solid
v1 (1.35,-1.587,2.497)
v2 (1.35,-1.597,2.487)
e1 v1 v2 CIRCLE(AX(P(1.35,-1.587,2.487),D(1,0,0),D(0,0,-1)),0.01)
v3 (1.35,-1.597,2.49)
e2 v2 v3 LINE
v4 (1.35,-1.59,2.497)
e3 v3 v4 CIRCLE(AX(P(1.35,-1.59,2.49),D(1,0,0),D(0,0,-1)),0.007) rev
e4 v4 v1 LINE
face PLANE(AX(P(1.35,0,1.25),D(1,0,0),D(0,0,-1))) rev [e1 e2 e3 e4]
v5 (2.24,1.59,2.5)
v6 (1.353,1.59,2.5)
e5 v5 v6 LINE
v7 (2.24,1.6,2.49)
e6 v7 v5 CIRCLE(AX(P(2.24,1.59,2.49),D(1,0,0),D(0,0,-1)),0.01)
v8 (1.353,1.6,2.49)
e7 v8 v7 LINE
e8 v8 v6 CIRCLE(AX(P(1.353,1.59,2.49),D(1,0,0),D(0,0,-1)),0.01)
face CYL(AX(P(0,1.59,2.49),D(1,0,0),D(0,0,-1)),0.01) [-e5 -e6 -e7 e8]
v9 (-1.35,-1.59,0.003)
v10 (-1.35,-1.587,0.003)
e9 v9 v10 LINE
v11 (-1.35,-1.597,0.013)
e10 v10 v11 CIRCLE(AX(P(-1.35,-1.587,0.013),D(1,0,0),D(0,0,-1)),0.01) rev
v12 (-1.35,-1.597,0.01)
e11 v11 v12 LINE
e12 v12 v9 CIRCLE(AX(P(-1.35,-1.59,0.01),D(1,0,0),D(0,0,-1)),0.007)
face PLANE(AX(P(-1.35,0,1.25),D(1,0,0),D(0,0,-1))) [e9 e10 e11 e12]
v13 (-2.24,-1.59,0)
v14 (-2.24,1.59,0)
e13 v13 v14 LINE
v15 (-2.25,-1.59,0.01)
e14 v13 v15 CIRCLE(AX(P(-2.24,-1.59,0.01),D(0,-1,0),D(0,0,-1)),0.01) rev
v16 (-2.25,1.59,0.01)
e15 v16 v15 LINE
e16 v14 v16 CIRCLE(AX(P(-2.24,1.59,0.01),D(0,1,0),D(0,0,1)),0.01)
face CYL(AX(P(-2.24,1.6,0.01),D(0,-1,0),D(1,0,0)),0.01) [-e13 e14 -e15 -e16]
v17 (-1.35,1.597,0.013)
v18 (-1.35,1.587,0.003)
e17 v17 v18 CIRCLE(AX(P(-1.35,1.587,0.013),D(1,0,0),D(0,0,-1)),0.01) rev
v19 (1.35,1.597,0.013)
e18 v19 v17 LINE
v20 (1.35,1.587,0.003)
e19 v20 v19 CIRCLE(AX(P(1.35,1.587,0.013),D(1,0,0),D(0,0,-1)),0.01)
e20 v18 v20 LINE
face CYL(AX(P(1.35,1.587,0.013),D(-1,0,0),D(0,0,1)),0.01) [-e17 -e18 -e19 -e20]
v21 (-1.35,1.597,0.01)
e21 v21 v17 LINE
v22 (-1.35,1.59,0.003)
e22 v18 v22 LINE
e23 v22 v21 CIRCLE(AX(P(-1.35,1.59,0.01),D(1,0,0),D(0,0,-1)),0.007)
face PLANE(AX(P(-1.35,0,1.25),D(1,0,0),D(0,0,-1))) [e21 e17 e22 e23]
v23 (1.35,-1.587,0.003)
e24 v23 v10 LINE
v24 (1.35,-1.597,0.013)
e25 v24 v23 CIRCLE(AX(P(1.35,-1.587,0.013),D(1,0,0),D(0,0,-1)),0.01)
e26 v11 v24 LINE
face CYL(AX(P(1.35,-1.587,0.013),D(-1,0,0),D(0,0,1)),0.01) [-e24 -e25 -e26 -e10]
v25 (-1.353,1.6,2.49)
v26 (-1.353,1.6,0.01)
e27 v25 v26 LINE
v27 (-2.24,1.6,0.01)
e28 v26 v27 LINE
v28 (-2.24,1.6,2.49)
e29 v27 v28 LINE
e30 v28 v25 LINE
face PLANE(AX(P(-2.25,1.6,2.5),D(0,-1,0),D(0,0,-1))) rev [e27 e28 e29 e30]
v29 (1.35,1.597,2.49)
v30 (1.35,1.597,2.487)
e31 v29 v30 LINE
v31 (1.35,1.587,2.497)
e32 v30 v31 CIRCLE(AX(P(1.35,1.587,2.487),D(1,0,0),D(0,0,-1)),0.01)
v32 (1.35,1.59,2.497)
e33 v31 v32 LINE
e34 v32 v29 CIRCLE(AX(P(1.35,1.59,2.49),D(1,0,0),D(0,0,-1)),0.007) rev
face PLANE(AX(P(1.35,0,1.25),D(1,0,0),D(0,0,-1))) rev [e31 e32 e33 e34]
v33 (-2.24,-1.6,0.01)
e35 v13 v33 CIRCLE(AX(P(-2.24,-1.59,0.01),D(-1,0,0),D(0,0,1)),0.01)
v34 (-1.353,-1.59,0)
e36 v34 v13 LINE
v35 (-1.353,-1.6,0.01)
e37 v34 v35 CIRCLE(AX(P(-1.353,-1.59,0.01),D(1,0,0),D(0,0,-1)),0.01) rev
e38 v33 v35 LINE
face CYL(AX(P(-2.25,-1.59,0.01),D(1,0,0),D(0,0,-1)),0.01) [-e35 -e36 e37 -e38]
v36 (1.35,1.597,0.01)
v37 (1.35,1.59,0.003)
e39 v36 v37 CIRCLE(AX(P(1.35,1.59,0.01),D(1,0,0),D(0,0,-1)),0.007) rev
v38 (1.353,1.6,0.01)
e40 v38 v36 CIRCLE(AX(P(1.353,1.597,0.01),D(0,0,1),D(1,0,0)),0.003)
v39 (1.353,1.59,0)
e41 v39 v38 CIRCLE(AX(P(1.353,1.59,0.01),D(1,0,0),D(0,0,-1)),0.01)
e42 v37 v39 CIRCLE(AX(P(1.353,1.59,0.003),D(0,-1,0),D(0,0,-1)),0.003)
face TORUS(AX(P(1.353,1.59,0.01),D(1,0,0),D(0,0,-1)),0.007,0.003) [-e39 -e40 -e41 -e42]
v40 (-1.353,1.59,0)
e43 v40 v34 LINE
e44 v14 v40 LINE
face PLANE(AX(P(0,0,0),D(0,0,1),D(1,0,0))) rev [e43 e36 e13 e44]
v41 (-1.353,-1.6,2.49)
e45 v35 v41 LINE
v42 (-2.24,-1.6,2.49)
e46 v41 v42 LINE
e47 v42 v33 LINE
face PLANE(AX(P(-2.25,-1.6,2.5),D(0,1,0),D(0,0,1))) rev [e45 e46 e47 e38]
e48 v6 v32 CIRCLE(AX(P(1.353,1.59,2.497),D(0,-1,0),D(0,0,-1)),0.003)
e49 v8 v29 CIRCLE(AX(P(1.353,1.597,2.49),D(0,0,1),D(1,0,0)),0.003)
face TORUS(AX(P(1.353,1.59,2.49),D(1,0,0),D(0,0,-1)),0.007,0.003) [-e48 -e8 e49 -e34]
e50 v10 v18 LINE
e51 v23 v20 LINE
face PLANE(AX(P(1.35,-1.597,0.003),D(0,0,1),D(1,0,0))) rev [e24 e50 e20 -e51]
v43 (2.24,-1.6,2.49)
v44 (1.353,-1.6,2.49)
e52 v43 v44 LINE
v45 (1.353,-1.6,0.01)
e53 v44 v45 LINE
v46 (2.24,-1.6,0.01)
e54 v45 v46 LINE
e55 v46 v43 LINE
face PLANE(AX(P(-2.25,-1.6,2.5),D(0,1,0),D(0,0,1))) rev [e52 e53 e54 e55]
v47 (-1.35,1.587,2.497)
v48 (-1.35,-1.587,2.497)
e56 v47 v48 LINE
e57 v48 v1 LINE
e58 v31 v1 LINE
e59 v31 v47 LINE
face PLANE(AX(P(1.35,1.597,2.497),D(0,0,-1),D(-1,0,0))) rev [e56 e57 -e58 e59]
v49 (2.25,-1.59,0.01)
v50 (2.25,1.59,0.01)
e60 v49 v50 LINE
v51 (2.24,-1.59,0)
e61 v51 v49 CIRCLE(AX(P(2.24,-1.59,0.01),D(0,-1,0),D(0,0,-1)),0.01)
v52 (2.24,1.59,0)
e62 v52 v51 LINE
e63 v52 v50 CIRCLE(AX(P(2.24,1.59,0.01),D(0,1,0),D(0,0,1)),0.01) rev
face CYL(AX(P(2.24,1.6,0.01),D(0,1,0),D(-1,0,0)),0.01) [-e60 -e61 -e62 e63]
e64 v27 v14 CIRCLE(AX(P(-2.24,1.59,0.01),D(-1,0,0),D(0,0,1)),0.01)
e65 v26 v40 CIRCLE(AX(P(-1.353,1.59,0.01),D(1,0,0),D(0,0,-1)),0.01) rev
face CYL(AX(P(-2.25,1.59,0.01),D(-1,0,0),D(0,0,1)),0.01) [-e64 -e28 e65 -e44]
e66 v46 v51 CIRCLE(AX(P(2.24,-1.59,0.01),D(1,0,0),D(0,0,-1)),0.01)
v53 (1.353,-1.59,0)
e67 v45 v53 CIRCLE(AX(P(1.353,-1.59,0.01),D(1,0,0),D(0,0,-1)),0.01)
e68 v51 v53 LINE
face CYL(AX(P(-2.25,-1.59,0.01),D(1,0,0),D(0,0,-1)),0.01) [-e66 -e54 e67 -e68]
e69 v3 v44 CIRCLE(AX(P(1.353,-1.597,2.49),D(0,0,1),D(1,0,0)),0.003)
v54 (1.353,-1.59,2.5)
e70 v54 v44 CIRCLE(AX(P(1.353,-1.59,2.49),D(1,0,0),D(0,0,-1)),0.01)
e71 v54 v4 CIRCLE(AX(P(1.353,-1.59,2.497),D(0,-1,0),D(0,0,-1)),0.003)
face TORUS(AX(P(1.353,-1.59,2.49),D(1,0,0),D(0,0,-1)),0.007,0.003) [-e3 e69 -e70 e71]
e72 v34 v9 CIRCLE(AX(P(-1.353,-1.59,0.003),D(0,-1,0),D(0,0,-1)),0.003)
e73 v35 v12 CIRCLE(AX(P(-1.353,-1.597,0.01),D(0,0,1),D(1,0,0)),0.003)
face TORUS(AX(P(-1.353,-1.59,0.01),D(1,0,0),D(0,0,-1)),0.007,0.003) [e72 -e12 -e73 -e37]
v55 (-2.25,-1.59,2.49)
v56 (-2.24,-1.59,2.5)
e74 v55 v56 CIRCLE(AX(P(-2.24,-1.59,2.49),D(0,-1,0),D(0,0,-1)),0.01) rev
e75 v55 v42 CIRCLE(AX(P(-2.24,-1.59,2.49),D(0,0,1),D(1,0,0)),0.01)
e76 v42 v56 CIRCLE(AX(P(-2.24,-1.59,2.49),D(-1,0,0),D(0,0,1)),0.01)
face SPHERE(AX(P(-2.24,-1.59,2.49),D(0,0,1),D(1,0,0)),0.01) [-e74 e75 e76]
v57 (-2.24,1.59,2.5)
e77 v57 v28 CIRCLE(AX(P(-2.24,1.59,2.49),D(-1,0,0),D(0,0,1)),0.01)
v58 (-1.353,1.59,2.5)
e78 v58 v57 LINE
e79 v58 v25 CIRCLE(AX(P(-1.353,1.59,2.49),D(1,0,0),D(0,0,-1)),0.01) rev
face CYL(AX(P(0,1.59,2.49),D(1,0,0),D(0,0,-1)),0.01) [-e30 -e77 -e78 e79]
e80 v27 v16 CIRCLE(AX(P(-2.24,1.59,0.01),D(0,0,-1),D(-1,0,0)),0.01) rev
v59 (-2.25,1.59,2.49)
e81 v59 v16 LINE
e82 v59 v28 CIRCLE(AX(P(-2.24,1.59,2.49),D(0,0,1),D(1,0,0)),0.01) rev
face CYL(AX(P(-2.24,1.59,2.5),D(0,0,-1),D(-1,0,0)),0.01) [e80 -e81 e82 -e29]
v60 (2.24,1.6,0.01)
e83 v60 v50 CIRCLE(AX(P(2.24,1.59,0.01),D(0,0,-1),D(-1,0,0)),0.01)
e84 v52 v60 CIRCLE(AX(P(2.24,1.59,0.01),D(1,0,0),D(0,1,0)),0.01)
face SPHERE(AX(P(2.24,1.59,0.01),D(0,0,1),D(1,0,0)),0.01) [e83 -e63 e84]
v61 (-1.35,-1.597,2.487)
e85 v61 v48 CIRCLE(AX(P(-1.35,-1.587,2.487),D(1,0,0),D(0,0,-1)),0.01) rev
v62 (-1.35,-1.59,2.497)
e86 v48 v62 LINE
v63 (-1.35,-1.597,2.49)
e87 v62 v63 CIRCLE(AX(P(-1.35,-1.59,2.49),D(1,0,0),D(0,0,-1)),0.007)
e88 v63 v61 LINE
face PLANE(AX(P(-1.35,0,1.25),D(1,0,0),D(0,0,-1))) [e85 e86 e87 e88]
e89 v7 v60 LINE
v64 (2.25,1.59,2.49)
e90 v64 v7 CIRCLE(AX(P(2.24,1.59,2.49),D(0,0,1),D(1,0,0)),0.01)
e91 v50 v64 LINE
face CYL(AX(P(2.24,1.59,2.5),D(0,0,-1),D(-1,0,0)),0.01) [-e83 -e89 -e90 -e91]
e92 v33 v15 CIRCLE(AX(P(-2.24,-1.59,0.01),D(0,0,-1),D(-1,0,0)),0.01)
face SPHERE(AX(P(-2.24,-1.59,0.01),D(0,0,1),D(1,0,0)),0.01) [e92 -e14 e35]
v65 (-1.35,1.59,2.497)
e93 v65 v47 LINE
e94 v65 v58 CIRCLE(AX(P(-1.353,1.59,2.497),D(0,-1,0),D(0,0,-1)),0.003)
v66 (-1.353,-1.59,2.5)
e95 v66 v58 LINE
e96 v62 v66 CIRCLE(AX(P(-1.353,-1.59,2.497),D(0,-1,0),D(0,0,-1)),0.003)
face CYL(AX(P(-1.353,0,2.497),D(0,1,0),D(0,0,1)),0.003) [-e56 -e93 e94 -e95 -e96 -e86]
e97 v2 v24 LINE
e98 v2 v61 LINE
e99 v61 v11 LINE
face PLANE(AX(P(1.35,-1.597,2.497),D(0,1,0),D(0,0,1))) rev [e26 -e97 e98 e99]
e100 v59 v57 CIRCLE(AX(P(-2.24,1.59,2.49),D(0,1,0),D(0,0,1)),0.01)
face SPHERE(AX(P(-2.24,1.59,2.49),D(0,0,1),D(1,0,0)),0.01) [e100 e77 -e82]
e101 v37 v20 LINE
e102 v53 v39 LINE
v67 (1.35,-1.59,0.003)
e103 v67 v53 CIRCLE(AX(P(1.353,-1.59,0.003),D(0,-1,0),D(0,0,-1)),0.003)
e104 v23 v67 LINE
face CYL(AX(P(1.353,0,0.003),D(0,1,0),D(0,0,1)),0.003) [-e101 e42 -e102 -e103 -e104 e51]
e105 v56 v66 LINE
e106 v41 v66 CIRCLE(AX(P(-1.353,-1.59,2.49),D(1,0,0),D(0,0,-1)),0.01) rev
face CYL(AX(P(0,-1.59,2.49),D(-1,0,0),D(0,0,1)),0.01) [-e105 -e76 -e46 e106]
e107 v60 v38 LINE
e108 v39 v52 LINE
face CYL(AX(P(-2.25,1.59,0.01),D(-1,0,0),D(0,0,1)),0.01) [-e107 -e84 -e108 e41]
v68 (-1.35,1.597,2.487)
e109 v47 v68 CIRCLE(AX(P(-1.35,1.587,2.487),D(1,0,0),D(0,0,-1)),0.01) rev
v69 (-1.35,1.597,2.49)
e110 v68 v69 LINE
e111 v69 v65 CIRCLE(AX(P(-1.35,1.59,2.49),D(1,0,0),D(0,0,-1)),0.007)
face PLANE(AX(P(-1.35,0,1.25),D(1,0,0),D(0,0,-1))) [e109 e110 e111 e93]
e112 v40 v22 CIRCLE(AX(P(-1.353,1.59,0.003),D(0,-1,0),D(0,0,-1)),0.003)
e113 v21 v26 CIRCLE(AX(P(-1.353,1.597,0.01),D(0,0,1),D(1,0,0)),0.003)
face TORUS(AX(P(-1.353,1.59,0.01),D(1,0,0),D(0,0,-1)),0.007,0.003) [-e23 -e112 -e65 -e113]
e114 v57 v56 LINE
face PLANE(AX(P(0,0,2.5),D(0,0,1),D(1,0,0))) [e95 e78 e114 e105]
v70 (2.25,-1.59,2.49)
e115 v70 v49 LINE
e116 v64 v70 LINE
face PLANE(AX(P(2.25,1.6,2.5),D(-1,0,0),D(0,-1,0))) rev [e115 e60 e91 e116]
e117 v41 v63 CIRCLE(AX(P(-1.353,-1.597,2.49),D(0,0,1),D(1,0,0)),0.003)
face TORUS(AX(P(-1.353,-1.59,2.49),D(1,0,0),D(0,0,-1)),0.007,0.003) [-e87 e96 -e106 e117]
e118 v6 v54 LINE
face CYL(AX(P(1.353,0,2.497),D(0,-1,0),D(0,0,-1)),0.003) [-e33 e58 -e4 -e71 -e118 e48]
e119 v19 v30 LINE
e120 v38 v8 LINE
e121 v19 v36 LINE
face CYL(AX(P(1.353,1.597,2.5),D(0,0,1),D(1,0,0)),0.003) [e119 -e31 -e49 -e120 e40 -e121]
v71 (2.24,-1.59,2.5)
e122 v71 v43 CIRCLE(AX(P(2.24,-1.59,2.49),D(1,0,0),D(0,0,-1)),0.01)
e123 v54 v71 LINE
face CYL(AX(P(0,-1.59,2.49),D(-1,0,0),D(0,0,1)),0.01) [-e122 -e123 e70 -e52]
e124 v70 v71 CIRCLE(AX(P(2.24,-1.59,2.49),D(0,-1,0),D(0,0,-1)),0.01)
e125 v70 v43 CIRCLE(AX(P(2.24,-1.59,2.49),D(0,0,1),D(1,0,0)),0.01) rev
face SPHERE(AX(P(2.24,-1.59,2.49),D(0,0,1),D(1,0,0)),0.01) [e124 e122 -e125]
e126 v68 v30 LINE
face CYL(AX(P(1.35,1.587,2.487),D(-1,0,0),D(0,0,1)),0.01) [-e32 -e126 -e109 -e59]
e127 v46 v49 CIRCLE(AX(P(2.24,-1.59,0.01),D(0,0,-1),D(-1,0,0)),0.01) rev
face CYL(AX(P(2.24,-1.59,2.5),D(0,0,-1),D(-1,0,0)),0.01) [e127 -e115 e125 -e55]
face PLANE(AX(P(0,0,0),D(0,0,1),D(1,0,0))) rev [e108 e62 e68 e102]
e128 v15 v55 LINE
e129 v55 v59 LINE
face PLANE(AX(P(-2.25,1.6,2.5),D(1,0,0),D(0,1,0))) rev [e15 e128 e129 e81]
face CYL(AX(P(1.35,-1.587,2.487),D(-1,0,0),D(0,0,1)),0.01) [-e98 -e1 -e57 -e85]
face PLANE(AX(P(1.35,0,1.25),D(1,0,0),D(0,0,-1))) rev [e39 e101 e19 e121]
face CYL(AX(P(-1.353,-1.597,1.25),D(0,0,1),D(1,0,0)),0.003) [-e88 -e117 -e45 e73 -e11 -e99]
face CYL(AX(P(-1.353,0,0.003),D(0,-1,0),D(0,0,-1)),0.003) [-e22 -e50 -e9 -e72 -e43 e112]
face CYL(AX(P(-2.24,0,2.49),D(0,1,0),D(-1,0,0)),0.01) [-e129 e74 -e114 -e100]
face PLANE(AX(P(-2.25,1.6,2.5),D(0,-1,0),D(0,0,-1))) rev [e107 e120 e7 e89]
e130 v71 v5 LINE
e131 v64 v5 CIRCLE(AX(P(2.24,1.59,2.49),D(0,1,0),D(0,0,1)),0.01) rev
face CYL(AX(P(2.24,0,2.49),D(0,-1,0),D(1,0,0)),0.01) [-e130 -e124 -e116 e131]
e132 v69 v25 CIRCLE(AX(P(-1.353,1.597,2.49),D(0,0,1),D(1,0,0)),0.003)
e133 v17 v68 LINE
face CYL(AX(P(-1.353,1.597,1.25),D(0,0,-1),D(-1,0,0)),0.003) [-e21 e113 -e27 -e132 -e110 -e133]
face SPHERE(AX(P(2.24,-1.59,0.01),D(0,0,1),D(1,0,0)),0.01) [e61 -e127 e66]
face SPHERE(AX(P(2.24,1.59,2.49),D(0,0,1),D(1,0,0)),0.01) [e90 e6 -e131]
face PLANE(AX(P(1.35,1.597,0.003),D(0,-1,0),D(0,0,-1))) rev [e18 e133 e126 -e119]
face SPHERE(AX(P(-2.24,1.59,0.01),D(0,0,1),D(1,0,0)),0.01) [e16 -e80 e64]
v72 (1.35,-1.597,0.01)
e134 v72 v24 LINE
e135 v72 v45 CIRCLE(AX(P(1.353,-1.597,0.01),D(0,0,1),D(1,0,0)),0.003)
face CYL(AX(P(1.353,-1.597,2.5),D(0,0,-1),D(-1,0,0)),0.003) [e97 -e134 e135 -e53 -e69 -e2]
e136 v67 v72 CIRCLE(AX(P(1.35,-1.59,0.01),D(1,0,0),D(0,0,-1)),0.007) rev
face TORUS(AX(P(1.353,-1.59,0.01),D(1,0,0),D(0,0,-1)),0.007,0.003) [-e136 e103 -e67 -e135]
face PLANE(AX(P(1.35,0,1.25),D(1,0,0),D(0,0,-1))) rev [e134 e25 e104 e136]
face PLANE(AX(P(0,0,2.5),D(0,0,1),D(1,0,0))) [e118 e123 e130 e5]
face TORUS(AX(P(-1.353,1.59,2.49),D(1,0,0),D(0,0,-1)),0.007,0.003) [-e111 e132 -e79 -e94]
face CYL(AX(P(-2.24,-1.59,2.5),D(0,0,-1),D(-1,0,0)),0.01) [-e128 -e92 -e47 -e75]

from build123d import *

# Parameters (mm, degrees)
SKETCH1_W                           = 4.5
SKETCH1_H                           = 3.2
ALL_BODY_DEPTH                      = 2.5
CUT_OUT_THE_BODY_FOR_PIN_DEPTH      = 1.35
CUT_OUT_THE_BODY_FOR_PIN_DEPTH_BACK = 1.35
SKETCH2_OUTSIDE_W                   = 5.712
SKETCH2_OUTSIDE_H                   = 6.412
SKETCH2_OUTSIDE_W_2                 = 2.494
SKETCH2_OUTSIDE_H_2                 = 3.194
BODY_FILLET_R                       = 0.01
PIN_FILLET_A_R                      = 0.01
PIN_FILLET_B_R                      = 0.003


with BuildPart() as part:
    # Sketch1 → All body (new body)
    with BuildSketch(Plane.XY):
        Rectangle(SKETCH1_W, SKETCH1_H)
    extrude(amount=ALL_BODY_DEPTH)

    # Sketch2 outside → Cut out the body for pin (cut, two sides: drawn at the far end of the back side and taken through both)
    with BuildSketch(Plane(origin=(0, 0, 0), x_dir=(0, 0, -1), z_dir=(1, 0, 0)).offset(-CUT_OUT_THE_BODY_FOR_PIN_DEPTH_BACK)):
        with Locations((-1.25, 0)):
            Rectangle(SKETCH2_OUTSIDE_W, SKETCH2_OUTSIDE_H)
        with Locations((-1.25, 0)):
            Rectangle(SKETCH2_OUTSIDE_W_2, SKETCH2_OUTSIDE_H_2, mode=Mode.SUBTRACT)
    extrude(amount=CUT_OUT_THE_BODY_FOR_PIN_DEPTH + CUT_OUT_THE_BODY_FOR_PIN_DEPTH_BACK, mode=Mode.SUBTRACT)

    # Body fillet
    body_fillet_edges = [part.edges().sort_by_distance(p)[0] for p in [
        (0, 1.597, 0.003),
        (0, 1.597, 2.497),
        (0, -1.597, 2.497),
        (0, -1.597, 0.003),
    ]]
    fillet(body_fillet_edges, radius=BODY_FILLET_R)

    # Pin fillet a
    pin_fillet_a_edges = [part.edges().sort_by_distance(p)[0] for p in [
        (2.25, 0, 2.5),
        (-1.8, 1.6, 0),
        (1.8, -1.6, 0),
        (1.8, -1.6, 2.5),
        (-1.8, 1.6, 2.5),
        (1.8, 1.6, 2.5),
        (-2.25, 0, 2.5),
        (1.8, 1.6, 0),
        (2.25, 0, 0),
        (-1.8, -1.6, 0),
        (-2.25, 0, 0),
        (-2.25, 1.6, 1.25),
        (2.25, 1.6, 1.25),
        (2.25, -1.6, 1.25),
        (-2.25, -1.6, 1.25),
        (-1.8, -1.6, 2.5),
    ]]
    fillet(pin_fillet_a_edges, radius=PIN_FILLET_A_R)

    # Pin fillet b
    pin_fillet_b_edges = [part.edges().sort_by_distance(p)[0] for p in [
        (1.35, -1.6, 1.25),
        (1.35, 0, 2.5),
        (1.35, 1.6, 1.25),
        (1.35, 0, 0),
        (-1.35, 1.6, 1.25),
        (-1.35, 0, 2.5),
        (-1.35, -1.6, 1.25),
        (-1.35, 0, 0),
        (1.35, 1.597071068, 0.002928932),
        (1.35, -1.597071068, 0.002928932),
        (1.35, -1.597071068, 2.497071068),
        (1.35, 1.597071068, 2.497071068),
        (-1.35, -1.597071068, 2.497071068),
        (-1.35, 1.597071068, 2.497071068),
        (-1.35, -1.597071068, 0.002928932),
        (-1.35, 1.597071068, 0.002928932),
    ]]
    fillet(pin_fillet_b_edges, radius=PIN_FILLET_B_R - 0.0001)  # a hair under: the kernel refuses the full size


solid = part.part
